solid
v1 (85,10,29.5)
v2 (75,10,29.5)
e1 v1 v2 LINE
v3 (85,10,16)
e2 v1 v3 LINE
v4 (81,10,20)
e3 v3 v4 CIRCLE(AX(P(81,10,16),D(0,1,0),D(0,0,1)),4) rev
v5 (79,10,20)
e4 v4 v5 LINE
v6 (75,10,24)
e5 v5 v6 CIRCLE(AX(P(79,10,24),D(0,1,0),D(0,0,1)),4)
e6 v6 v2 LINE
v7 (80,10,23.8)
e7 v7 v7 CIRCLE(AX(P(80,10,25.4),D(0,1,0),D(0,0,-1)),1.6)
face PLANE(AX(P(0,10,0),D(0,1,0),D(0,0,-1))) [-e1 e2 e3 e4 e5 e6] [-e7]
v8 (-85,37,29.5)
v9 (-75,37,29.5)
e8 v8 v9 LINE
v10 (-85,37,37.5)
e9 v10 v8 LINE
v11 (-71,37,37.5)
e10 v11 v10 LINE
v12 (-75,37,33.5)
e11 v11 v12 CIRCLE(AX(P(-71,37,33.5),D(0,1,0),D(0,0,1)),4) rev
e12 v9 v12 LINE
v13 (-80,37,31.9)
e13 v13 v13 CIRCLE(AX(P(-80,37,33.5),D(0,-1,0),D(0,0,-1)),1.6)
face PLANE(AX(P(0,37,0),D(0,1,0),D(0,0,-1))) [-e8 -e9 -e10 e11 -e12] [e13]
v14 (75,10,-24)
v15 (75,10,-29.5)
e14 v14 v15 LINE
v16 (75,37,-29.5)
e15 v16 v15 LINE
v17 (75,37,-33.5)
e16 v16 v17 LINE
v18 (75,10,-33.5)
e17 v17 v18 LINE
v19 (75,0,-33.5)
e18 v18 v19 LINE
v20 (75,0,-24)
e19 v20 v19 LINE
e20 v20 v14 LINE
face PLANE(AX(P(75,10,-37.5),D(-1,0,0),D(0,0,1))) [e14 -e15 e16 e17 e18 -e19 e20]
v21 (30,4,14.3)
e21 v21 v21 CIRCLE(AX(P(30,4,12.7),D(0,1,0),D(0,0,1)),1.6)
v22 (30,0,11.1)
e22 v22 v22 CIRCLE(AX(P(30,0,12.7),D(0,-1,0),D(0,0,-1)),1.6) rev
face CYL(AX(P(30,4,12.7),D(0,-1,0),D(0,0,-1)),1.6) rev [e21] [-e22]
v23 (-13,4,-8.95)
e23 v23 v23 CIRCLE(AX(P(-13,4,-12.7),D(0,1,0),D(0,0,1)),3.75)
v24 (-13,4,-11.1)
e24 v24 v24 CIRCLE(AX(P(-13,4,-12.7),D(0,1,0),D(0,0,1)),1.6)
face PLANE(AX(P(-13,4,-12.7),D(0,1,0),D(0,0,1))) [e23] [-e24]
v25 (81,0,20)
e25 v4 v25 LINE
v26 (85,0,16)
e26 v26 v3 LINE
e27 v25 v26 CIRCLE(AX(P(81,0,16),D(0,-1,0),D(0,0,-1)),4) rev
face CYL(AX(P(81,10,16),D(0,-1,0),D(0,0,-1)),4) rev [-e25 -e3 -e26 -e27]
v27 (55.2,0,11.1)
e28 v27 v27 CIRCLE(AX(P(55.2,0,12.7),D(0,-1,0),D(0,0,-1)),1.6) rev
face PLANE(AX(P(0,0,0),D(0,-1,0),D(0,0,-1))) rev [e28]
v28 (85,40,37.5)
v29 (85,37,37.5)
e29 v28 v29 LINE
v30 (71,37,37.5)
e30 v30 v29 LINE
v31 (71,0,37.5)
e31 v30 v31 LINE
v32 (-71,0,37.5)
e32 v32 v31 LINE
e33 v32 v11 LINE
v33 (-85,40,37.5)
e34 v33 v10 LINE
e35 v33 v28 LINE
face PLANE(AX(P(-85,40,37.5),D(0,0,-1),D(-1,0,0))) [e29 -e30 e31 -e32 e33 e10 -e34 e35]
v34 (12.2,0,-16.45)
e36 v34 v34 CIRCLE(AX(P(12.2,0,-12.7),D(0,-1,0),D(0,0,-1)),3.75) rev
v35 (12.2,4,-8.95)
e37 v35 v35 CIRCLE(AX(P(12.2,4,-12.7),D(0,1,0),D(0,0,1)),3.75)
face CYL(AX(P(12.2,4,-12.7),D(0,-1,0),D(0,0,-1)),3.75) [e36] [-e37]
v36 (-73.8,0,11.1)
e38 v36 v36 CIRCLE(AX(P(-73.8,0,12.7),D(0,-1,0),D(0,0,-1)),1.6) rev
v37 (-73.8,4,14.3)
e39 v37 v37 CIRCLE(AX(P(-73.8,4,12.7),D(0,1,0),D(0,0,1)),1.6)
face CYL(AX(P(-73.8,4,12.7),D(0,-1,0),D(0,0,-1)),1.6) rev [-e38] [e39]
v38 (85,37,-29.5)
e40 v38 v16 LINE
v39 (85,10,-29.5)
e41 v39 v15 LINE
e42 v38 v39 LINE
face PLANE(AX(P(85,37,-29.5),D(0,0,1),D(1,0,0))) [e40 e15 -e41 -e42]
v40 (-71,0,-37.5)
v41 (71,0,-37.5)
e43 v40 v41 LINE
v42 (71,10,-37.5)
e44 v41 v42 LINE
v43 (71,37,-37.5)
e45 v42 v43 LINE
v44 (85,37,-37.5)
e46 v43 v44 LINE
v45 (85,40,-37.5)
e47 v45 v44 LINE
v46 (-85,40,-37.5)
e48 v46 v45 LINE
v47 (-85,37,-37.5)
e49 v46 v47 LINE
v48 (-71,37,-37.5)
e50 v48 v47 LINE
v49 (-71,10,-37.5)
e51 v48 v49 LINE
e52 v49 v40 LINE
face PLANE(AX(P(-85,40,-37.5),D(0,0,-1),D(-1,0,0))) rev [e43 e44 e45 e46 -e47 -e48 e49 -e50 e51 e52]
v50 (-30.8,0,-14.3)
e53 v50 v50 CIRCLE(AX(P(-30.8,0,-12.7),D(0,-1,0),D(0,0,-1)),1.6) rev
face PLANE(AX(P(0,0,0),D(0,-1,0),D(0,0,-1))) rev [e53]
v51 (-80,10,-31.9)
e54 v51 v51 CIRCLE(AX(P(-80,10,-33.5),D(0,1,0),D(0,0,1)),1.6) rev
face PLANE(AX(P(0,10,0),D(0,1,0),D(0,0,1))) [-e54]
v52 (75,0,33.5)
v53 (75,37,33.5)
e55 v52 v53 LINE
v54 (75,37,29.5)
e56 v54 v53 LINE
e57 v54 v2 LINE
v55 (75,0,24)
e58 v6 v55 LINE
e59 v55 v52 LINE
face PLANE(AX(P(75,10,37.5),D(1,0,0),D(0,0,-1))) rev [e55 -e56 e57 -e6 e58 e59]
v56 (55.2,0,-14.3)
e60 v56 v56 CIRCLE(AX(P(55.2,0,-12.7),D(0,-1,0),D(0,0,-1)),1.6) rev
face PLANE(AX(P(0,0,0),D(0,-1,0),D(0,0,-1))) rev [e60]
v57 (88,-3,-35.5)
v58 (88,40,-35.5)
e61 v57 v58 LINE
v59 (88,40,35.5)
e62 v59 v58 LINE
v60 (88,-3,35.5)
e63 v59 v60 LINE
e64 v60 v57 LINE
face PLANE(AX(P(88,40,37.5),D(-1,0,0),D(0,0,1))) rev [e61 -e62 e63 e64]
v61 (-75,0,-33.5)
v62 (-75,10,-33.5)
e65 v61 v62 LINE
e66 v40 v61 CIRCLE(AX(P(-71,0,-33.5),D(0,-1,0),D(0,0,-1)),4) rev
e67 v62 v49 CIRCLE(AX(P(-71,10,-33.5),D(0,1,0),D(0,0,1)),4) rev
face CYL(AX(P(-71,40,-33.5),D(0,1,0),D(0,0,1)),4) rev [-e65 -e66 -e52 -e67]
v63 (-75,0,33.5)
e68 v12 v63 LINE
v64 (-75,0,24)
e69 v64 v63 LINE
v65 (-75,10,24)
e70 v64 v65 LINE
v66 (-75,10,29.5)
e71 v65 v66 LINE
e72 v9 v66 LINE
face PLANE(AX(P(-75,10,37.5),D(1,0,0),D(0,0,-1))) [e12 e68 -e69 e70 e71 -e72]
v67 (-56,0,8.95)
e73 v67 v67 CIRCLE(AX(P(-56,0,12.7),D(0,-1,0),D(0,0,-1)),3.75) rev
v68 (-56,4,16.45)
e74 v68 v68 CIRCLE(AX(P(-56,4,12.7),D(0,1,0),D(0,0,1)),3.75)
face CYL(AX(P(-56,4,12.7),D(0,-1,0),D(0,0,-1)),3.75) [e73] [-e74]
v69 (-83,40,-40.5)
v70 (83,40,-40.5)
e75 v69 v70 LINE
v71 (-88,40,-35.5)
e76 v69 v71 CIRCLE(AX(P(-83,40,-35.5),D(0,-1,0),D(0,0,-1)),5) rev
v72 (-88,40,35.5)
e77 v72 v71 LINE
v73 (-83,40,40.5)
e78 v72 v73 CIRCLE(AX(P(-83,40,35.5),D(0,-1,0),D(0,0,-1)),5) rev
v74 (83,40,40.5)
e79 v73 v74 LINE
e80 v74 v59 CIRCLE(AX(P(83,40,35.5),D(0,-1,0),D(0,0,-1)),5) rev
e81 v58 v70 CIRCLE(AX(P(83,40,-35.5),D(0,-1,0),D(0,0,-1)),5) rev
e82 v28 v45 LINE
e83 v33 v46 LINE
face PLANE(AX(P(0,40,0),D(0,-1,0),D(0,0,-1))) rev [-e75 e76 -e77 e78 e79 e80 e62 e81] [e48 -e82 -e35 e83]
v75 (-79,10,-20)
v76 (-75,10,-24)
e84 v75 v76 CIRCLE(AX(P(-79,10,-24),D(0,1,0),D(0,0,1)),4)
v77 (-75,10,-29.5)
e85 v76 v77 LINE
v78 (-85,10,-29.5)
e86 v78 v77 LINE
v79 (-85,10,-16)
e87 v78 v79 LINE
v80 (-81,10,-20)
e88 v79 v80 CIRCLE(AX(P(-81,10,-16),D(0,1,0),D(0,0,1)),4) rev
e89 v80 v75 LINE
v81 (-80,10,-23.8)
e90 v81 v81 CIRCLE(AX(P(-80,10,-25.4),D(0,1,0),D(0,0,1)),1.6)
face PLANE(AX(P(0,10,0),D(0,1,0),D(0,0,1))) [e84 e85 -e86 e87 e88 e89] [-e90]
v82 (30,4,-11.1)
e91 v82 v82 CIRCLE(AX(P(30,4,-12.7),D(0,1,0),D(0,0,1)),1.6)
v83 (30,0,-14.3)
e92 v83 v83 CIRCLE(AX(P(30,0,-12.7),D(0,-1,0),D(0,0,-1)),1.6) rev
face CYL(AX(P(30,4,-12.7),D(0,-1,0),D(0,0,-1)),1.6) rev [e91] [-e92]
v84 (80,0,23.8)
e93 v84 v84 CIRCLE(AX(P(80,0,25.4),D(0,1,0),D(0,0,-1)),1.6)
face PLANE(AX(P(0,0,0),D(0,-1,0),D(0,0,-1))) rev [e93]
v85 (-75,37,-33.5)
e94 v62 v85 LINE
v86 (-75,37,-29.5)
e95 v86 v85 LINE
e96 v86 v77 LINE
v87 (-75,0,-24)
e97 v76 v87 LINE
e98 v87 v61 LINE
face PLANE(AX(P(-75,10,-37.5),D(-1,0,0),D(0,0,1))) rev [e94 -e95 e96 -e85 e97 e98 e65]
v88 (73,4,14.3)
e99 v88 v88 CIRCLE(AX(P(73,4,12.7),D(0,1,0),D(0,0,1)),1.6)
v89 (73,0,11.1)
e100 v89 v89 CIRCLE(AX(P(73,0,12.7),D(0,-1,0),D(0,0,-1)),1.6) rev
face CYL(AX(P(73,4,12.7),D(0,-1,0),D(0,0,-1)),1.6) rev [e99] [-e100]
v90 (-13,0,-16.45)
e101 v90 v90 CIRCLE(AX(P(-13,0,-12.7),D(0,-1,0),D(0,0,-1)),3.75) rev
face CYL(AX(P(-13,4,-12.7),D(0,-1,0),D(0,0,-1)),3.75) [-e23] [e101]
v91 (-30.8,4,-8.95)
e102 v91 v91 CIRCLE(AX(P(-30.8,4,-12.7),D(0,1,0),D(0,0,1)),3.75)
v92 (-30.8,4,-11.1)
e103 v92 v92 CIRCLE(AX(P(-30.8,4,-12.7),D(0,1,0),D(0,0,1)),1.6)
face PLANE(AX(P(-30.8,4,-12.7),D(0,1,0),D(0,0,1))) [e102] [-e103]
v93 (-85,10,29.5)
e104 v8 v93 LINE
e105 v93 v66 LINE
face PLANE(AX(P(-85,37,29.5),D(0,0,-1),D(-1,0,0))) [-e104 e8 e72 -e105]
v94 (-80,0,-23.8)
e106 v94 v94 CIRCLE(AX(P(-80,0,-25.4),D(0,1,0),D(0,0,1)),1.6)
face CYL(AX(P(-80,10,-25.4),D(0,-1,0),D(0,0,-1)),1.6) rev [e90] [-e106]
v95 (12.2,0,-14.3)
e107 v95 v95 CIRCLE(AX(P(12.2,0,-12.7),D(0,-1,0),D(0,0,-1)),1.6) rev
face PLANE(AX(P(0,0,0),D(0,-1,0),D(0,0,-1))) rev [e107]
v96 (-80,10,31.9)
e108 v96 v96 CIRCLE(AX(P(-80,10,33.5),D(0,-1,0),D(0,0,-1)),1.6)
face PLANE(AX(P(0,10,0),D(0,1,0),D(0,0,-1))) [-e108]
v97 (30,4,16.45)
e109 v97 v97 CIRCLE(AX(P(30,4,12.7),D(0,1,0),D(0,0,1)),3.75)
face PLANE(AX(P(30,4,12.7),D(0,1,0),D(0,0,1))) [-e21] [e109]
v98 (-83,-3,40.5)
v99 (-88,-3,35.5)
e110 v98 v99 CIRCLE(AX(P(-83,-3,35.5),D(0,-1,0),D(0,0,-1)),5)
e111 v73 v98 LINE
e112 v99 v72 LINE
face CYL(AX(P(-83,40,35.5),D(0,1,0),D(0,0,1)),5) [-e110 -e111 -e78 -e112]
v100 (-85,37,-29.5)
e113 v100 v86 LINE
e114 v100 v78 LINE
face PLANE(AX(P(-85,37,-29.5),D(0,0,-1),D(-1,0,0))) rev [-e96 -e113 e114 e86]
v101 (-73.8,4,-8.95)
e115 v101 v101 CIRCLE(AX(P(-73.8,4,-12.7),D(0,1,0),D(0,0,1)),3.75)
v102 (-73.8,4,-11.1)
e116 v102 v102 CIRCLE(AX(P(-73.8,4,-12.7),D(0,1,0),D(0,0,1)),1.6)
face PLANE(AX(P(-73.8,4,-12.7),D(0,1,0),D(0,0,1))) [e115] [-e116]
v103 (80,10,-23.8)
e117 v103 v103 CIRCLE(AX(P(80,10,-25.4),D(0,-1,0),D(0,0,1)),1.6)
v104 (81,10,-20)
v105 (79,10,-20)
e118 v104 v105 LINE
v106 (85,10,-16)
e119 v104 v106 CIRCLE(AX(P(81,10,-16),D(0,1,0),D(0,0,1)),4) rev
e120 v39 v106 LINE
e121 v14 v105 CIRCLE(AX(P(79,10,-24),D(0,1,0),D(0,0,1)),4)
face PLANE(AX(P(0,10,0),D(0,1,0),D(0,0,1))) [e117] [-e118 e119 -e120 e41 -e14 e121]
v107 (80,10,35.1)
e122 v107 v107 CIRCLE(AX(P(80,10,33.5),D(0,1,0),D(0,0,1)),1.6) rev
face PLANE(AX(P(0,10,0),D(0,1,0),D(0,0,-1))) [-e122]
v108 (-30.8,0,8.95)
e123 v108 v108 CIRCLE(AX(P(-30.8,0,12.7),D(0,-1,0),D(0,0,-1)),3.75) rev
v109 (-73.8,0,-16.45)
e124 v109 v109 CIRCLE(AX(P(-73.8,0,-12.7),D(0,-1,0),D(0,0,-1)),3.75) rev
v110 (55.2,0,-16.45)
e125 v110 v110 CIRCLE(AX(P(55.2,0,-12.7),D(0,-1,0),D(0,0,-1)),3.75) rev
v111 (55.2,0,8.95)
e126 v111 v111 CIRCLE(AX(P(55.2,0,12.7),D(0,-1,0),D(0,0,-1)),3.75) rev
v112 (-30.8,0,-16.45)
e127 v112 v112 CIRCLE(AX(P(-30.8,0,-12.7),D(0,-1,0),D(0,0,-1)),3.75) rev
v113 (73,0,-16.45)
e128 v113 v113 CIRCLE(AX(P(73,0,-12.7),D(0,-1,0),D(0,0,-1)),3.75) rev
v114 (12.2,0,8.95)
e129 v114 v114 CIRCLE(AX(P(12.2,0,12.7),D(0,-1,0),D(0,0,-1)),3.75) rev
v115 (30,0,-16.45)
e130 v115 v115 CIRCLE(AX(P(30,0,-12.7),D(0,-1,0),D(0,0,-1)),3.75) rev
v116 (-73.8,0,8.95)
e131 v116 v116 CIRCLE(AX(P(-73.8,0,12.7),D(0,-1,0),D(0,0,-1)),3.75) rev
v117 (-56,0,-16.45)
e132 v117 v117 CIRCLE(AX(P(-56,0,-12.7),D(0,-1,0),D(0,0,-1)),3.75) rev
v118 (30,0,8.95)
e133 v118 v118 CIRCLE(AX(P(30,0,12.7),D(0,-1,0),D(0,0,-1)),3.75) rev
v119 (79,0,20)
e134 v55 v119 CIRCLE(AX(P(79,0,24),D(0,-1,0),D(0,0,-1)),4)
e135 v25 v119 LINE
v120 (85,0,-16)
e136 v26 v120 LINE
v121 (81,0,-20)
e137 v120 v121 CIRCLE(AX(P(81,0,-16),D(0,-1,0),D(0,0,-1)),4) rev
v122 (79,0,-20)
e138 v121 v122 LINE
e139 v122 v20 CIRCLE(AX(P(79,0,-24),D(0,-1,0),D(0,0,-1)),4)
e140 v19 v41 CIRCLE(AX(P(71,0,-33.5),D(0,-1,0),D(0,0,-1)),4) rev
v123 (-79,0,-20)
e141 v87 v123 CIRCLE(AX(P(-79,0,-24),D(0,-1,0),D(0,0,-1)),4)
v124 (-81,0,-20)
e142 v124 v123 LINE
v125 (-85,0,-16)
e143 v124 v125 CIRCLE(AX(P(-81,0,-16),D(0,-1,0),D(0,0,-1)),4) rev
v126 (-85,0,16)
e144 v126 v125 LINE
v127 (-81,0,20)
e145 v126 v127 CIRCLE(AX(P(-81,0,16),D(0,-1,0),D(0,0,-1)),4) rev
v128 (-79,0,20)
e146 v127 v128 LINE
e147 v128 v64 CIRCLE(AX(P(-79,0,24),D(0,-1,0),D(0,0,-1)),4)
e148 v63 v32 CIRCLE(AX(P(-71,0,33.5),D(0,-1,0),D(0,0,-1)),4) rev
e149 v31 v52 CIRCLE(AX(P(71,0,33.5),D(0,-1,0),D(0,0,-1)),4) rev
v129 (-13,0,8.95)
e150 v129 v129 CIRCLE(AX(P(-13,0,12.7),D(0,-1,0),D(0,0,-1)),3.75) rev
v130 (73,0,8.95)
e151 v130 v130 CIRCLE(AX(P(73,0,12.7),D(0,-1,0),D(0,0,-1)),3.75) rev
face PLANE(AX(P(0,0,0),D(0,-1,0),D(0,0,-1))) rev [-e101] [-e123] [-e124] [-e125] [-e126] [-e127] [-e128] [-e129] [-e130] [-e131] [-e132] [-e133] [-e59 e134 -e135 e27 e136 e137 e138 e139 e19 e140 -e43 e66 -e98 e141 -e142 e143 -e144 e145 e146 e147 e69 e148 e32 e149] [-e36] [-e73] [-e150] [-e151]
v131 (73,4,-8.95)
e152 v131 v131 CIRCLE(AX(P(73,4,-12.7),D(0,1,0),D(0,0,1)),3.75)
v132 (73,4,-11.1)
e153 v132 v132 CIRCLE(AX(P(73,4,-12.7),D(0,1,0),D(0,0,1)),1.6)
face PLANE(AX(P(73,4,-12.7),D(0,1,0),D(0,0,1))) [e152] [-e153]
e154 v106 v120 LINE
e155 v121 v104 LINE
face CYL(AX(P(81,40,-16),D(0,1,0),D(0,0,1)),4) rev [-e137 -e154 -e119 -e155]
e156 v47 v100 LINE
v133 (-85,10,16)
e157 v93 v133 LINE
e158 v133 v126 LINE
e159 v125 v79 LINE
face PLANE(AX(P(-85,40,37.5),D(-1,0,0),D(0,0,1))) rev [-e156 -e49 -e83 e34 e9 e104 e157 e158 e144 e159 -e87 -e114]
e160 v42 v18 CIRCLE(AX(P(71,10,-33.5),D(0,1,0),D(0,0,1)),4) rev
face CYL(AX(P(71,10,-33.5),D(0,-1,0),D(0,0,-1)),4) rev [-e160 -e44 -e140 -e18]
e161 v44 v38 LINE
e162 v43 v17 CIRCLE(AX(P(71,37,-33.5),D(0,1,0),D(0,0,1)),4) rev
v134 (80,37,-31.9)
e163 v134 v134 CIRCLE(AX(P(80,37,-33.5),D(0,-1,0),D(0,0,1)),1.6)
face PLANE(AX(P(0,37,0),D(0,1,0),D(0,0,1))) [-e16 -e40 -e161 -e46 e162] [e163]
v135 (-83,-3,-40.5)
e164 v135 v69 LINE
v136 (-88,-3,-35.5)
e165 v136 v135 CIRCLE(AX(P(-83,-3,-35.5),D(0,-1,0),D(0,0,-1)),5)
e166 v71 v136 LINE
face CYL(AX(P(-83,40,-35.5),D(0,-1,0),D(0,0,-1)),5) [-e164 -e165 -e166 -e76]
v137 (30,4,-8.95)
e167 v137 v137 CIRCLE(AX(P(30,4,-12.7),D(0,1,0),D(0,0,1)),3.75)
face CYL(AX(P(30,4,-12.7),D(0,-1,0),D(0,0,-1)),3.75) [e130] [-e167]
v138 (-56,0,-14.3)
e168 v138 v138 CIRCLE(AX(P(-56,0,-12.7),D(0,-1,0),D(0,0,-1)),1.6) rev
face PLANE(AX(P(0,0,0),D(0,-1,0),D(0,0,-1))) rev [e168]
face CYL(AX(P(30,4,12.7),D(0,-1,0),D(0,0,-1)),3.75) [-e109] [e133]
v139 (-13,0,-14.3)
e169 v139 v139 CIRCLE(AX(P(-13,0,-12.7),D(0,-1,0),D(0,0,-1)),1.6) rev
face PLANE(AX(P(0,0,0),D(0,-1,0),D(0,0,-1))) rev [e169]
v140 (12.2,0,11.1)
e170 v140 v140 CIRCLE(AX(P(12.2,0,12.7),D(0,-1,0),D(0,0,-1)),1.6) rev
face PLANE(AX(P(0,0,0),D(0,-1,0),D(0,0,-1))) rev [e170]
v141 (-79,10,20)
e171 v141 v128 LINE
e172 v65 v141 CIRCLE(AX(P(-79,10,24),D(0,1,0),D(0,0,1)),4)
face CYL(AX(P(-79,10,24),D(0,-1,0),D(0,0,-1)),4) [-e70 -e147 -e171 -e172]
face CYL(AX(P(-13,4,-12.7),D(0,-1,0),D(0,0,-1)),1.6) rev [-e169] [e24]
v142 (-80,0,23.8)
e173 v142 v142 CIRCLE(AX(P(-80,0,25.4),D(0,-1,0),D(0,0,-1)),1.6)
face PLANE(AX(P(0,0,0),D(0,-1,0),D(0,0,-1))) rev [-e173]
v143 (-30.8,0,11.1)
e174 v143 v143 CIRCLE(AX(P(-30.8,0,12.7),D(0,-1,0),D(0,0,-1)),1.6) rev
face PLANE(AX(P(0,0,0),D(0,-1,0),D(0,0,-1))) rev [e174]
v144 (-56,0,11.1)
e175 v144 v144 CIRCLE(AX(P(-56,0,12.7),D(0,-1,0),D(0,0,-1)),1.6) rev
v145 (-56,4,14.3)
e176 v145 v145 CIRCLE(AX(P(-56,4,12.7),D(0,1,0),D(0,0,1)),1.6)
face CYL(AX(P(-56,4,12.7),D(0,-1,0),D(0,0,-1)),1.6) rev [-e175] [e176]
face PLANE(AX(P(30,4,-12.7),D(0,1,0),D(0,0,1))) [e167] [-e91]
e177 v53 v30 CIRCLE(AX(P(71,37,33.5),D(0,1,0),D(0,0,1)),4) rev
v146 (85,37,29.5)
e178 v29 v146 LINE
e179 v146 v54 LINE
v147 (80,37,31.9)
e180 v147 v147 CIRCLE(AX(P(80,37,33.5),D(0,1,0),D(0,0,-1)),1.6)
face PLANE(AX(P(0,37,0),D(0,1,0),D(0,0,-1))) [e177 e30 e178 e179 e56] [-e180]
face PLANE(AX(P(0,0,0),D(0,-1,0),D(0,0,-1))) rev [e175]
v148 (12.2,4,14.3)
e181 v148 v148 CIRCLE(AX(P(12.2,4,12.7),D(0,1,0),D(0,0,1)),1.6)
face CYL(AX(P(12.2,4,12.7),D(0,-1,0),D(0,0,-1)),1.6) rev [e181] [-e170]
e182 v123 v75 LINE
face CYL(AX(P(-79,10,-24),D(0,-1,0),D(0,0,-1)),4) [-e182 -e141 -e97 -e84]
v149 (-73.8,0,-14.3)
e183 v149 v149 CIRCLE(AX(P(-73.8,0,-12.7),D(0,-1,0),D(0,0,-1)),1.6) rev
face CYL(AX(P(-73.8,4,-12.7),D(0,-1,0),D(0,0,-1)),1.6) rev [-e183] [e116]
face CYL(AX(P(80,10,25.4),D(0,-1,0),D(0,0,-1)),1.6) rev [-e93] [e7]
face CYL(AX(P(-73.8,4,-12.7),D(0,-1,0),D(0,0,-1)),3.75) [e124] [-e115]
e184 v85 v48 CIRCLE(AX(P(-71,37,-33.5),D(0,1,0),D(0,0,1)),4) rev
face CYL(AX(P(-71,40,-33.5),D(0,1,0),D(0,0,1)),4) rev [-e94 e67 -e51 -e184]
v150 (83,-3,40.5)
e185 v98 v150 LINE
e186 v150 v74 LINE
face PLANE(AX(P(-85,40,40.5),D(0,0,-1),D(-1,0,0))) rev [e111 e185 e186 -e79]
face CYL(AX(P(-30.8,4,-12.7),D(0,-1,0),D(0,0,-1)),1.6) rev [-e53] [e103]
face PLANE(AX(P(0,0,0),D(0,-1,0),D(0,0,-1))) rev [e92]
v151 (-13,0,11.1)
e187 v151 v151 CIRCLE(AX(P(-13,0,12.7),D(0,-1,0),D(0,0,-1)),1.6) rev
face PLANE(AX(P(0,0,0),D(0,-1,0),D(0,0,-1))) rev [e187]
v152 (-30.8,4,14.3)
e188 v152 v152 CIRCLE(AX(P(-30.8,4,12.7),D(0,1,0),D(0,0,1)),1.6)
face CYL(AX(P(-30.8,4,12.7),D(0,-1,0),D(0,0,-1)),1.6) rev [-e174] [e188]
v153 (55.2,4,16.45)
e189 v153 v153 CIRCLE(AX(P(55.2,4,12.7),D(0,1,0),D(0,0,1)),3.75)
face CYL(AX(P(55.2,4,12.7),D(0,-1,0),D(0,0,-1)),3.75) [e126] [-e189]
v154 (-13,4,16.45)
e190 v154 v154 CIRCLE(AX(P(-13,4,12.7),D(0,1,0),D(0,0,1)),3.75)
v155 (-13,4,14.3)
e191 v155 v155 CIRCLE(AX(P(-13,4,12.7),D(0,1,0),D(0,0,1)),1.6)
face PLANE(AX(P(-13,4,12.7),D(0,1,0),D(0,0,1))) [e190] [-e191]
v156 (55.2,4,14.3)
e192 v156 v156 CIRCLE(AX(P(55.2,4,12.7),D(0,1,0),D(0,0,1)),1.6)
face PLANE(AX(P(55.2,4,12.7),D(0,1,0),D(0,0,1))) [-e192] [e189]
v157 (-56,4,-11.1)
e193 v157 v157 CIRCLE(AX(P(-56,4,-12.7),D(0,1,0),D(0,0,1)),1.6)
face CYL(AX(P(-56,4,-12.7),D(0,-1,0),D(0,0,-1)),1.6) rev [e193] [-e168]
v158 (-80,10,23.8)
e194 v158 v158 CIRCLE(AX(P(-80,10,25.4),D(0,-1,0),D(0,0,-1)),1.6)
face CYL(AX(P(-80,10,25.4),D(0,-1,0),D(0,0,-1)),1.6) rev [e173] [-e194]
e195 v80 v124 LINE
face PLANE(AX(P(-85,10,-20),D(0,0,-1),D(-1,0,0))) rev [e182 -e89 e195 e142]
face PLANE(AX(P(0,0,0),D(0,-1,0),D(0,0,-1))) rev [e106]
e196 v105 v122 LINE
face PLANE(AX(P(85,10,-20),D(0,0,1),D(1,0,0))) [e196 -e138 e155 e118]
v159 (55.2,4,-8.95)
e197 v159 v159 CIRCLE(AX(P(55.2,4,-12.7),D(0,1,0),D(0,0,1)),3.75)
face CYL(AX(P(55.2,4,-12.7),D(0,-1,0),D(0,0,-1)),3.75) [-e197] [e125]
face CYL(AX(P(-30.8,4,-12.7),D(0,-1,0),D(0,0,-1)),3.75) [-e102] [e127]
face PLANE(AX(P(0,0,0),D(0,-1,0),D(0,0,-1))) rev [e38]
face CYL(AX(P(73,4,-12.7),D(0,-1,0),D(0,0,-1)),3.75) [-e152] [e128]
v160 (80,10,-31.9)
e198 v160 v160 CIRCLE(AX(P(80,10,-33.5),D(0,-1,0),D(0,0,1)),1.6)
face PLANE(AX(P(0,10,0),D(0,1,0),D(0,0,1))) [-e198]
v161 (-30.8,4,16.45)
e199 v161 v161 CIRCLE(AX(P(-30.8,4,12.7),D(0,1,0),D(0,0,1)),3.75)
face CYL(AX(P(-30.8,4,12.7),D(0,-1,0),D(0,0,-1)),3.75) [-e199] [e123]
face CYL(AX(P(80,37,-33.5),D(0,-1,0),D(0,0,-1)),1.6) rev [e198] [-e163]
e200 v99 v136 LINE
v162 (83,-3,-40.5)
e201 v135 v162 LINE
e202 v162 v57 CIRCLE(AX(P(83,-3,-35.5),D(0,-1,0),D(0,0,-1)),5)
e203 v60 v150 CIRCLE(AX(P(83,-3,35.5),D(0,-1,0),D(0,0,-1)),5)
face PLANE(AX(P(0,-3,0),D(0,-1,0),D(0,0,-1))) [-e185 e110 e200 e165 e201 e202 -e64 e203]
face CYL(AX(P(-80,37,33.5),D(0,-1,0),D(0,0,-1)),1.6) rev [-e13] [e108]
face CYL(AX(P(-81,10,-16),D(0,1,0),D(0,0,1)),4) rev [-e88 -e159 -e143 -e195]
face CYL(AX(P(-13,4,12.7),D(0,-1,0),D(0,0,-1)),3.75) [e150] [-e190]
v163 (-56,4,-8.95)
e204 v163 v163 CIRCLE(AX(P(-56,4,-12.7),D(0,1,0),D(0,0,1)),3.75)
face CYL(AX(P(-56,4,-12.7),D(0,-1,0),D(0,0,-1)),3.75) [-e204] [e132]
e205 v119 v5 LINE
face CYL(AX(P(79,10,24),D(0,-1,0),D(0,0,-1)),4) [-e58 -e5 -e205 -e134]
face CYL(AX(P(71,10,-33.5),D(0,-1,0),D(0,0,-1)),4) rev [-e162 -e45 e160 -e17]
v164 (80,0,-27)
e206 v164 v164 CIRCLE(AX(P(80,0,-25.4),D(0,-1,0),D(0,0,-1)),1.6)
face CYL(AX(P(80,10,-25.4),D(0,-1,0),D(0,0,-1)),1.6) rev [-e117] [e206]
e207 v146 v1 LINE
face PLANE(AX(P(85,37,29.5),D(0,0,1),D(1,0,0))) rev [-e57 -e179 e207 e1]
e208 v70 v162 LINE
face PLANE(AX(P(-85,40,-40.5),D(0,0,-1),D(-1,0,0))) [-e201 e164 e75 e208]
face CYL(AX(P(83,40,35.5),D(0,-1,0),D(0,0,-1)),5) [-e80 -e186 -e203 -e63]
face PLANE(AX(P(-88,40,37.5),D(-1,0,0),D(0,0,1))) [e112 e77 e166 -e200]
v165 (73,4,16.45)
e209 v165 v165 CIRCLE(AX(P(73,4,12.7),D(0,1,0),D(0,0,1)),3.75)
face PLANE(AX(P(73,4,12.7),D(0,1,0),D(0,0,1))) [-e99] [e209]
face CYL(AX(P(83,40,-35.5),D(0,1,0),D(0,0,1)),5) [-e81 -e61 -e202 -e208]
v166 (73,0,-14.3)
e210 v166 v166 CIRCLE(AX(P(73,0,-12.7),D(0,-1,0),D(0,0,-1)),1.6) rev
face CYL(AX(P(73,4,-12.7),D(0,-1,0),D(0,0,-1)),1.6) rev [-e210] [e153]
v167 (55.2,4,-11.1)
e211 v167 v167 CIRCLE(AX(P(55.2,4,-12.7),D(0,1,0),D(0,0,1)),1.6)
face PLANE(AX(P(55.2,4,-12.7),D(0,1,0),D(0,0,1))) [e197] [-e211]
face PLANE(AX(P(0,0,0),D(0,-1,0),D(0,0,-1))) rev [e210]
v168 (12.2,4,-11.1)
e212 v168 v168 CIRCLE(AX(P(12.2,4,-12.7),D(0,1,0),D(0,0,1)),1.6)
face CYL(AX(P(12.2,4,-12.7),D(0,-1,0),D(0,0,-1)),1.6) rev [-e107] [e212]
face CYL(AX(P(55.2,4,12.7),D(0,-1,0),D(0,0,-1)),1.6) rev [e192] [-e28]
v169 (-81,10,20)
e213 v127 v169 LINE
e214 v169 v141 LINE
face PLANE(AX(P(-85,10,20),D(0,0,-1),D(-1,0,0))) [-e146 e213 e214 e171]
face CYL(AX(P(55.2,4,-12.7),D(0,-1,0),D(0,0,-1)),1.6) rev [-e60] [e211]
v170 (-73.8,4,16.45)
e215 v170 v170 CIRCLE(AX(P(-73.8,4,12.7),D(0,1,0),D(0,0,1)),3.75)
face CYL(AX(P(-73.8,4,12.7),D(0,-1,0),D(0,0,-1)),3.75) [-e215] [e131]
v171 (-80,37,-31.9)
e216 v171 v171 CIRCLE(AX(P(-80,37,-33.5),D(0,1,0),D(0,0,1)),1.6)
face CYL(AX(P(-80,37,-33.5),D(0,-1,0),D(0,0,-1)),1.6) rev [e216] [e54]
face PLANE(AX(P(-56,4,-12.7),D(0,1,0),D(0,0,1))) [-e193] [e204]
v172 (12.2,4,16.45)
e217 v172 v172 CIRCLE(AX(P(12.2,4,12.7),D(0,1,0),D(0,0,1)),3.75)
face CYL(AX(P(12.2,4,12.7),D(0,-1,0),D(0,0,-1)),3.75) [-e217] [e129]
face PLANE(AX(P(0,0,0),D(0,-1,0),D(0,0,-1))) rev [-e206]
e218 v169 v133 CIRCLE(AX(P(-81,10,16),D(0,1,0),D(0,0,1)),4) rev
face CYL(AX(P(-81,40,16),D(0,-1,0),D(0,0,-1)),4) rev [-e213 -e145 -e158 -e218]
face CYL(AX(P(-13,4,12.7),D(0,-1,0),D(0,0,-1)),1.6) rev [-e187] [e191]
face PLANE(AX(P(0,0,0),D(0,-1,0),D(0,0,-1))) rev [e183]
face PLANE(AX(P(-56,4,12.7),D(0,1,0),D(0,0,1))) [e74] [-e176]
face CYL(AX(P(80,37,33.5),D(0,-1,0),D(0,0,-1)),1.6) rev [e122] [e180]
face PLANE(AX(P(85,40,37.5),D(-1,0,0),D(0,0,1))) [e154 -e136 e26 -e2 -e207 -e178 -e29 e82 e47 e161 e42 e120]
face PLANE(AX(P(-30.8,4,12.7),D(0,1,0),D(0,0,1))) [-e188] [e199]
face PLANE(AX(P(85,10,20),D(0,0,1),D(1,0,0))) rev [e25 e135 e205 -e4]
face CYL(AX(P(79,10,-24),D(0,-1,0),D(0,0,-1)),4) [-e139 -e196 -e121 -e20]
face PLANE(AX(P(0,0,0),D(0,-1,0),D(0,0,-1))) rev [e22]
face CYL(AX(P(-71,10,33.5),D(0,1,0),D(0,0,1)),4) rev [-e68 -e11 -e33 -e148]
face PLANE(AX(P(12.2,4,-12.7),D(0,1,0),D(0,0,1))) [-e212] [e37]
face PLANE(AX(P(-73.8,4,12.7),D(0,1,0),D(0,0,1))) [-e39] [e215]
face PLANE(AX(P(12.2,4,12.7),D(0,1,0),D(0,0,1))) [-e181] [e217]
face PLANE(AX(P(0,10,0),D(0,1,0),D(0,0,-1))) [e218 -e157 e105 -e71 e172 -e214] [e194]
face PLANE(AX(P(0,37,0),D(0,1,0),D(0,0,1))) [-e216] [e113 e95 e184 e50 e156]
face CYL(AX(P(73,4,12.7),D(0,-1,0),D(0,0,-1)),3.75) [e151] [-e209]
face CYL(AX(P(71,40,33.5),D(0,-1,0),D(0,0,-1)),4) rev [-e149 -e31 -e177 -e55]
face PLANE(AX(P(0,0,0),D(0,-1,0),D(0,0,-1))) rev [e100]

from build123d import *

# Parameters (mm, degrees)
SKETCH1_W           = 170
SKETCH1_H           = 75
BOSS_EXTRUDE1_DEPTH = 40
SHELL1_T            = 3
FILLET1_R           = 5
SKETCH2_W           = 10
SKETCH2_H           = 17.5
SKETCH2_R           = 1.6
BOSS_EXTRUDE2_DEPTH = 10
FILLET2_R           = 4
SKETCH5_W           = 10
SKETCH5_H           = 8
SKETCH5_R           = 1.6
BOSS_EXTRUDE3_DEPTH = 27
FILLET3_R           = 4
MIRROR7_OUTLINE_W   = 10
MIRROR7_OUTLINE_H   = 8
MIRROR7_OUTLINE_R   = 1.6
MIRROR7_DEPTH       = 37
MIRROR7_2_OUTLINE_R = 1.6
MIRROR7_2_DEPTH     = 10
MIRROR9_OUTLINE_W   = 10
MIRROR9_OUTLINE_H   = 8
MIRROR9_OUTLINE_R   = 1.6
MIRROR9_DEPTH       = 37
MIRROR9_2_OUTLINE_R = 1.6
MIRROR9_2_DEPTH     = 10
FILLET5_R           = 4
SKETCH6_R           = 3.75
SKETCH6_R_2         = 1.6
BOSS_EXTRUDE4_DEPTH = 7
LPATTERN1_COUNT     = 4
LPATTERN1_PITCH     = 43


# Read off the part's stored shape, not the designer's step: Mirror7, Mirror9
# Some blends are built 0.0001 mm under size
with BuildPart() as part:
    # Sketch1 → Boss-Extrude1 (new body)
    with BuildSketch(Plane(origin=(0, 0, 0), x_dir=(1, 0, 0), z_dir=(0, 1, 0))):
        Rectangle(SKETCH1_W, SKETCH1_H)
    extrude(amount=BOSS_EXTRUDE1_DEPTH)

    # Shell1
    shell1_openings = [part.faces().sort_by_distance(p)[0] for p in [
        (0, 40, 0),
    ]]
    offset(amount=SHELL1_T, openings=shell1_openings, kind=Kind.INTERSECTION)

    # Fillet1
    # the kernel refuses this fillet: 5 mm, written as the material it takes off along each edge
    with BuildSketch(Plane(origin=(-88, 52.5, 40.5), x_dir=(1, 0, 0), z_dir=(0, -1, 0)), Plane(origin=(88, -15.5, 40.5), x_dir=(-1, 0, 0), z_dir=(0, 1, 0)), Plane(origin=(88, -15.5, -40.5), x_dir=(0, 0, 1), z_dir=(0, 1, 0)), Plane(origin=(-88, -15.5, -40.5), x_dir=(1, 0, 0), z_dir=(0, 1, 0))) as fillet1_piece_1:
        with BuildLine():
            CenterArc((FILLET1_R, -FILLET1_R), FILLET1_R, 90, 90)
            Line((0, -FILLET1_R), (0, 0))
            Line((0, 0), (FILLET1_R, 0))
        make_face()
    extrude(amount=68, mode=Mode.SUBTRACT)

    # Sketch2 → Boss-Extrude2 (add)
    with BuildSketch(Plane(origin=(0, 0, 0), x_dir=(1, 0, 0), z_dir=(0, 1, 0))):
        with Locations((-80, 28.75)):
            Rectangle(SKETCH2_W, SKETCH2_H)
        with Locations(Location((-80, 25.4, 0), (0, 0, 270))):
            Circle(SKETCH2_R, mode=Mode.SUBTRACT)
    extrude(amount=BOSS_EXTRUDE2_DEPTH)

    # Fillet2
    fillet2_edges = [part.edges().sort_by_distance(p)[0] for p in [
        (-85, 5, -20),
        (-75, 5, -20),
        (-75, 5, -37.5),
    ]]
    fillet(fillet2_edges, radius=FILLET2_R)

    # Sketch5 → Boss-Extrude3 (add)
    with BuildSketch(Plane(origin=(0, 10, 0), x_dir=(1, 0, 0), z_dir=(0, 1, 0))):
        with Locations((-80, 33.5)):
            Rectangle(SKETCH5_W, SKETCH5_H)
        with Locations(Location((-80, 33.5, 0), (0, 0, 270))):
            Circle(SKETCH5_R, mode=Mode.SUBTRACT)
    extrude(amount=BOSS_EXTRUDE3_DEPTH)

    # Fillet3
    fillet3_edges = [part.edges().sort_by_distance(p)[0] for p in [
        (-75, 23.5, -37.5),
    ]]
    fillet(fillet3_edges, radius=FILLET3_R)

    # Mirror7 outline → Mirror7 (add)
    with BuildSketch(Plane(origin=(0, 0, 0), x_dir=(1, 0, 0), z_dir=(0, 1, 0))):
        with Locations((-80, -33.5)):
            Rectangle(MIRROR7_OUTLINE_W, MIRROR7_OUTLINE_H)
        with Locations((-80, -33.5)):
            Circle(MIRROR7_OUTLINE_R, mode=Mode.SUBTRACT)
    extrude(amount=MIRROR7_DEPTH)

    # Mirror7 2 outline → Mirror7 2 (add)
    # profile 1 of 2: a face of its own
    with BuildSketch(Plane(origin=(0, 0, 0), x_dir=(1, 0, 0), z_dir=(0, 1, 0))):
        with BuildLine():
            Line((-85, -29.5), (-75, -29.5))
            Line((-75, -29.5), (-75, -24))
            ThreePointArc((-75, -24), (-76.171572875, -21.171572875), (-79, -20))
            Line((-79, -20), (-81, -20))
            ThreePointArc((-81, -20), (-83.828427125, -18.828427125), (-85, -16))
            Line((-85, -16), (-85, -29.5))
        make_face()
        with Locations((-80, -25.4)):
            Circle(MIRROR7_2_OUTLINE_R, mode=Mode.SUBTRACT)
    # profile 2 of 2: a face of its own
    with BuildSketch(Plane(origin=(0, 0, 0), x_dir=(1, 0, 0), z_dir=(0, 1, 0))):
        with Locations((-80, -33.5)):
            Circle(MIRROR7_2_OUTLINE_R)
    extrude(amount=MIRROR7_2_DEPTH)

    # Mirror9 outline → Mirror9 (add)
    # profile 1 of 2: a face of its own
    with BuildSketch(Plane(origin=(0, 0, 0), x_dir=(1, 0, 0), z_dir=(0, 1, 0))):
        with Locations((80, 33.5)):
            Rectangle(MIRROR9_OUTLINE_W, MIRROR9_OUTLINE_H)
        with Locations((80, 33.5)):
            Circle(MIRROR9_OUTLINE_R, mode=Mode.SUBTRACT)
    # profile 2 of 2: a face of its own
    with BuildSketch(Plane(origin=(0, 0, 0), x_dir=(1, 0, 0), z_dir=(0, 1, 0))):
        with Locations((80, -33.5)):
            Rectangle(MIRROR9_OUTLINE_W, MIRROR9_OUTLINE_H)
        with Locations((80, -33.5)):
            Circle(MIRROR9_OUTLINE_R, mode=Mode.SUBTRACT)
    extrude(amount=MIRROR9_DEPTH)

    # Mirror9 2 outline → Mirror9 2 (add)
    # profile 1 of 5: a face of its own
    with BuildSketch(Plane(origin=(0, 0, 0), x_dir=(1, 0, 0), z_dir=(0, 1, 0))):
        with BuildLine():
            ThreePointArc((75, 24), (76.171572875, 21.171572875), (79, 20))
            Line((79, 20), (85, 20))
            Line((85, 20), (85, 29.5))
            Line((85, 29.5), (75, 29.5))
            Line((75, 29.5), (75, 24))
        make_face()
        with Locations((80, 25.4)):
            Circle(MIRROR9_2_OUTLINE_R, mode=Mode.SUBTRACT)
    # profile 2 of 5: a face of its own
    with BuildSketch(Plane(origin=(0, 0, 0), x_dir=(1, 0, 0), z_dir=(0, 1, 0))):
        with BuildLine():
            Line((85, -29.5), (85, -20))
            Line((85, -20), (79, -20))
            ThreePointArc((79, -20), (76.171572875, -21.171572875), (75, -24))
            Line((75, -24), (75, -29.5))
            Line((75, -29.5), (85, -29.5))
        make_face()
        with Locations((80, -25.4)):
            Circle(MIRROR9_2_OUTLINE_R, mode=Mode.SUBTRACT)
    # profile 3 of 5: a face of its own
    with BuildSketch(Plane(origin=(0, 0, 0), x_dir=(1, 0, 0), z_dir=(0, 1, 0))):
        with BuildLine():
            ThreePointArc((71, 37.5), (73.828427125, 36.328427125), (75, 33.5))
            Line((75, 33.5), (75, 37.5))
            Line((75, 37.5), (71, 37.5))
        make_face()
    # profile 4 of 5: a face of its own
    with BuildSketch(Plane(origin=(0, 0, 0), x_dir=(1, 0, 0), z_dir=(0, 1, 0))):
        with Locations((80, -33.5)):
            Circle(MIRROR9_2_OUTLINE_R)
    # profile 5 of 5: a face of its own
    with BuildSketch(Plane(origin=(0, 0, 0), x_dir=(1, 0, 0), z_dir=(0, 1, 0))):
        with Locations((80, 33.5)):
            Circle(MIRROR9_2_OUTLINE_R)
    extrude(amount=MIRROR9_2_DEPTH)

    # Fillet5
    fillet5_edges = [part.edges().sort_by_distance(p)[0] for p in [
        (75, 18.5, 37.5),
        (85, 5, 20),
        (85, 5, -20),
        (75, 23.5, -37.5),
        (-75, 18.5, 37.5),
    ]]
    fillet(fillet5_edges, radius=FILLET5_R - 0.0001)  # a hair under: the kernel refuses the full size

    # Sketch6 → Boss-Extrude4 (add)
    # profile 1 of 4: a face of its own
    with BuildSketch(Plane(origin=(0, -3, 0), x_dir=(1, 0, 0), z_dir=(0, 1, 0))):
        with Locations(Location((-56, 12.7, 0), (0, 0, 90))):
            Circle(SKETCH6_R)
        with Locations(Location((-56, 12.7, 0), (0, 0, 90))):
            Circle(SKETCH6_R_2, mode=Mode.SUBTRACT)
    # profile 2 of 4: a face of its own
    with BuildSketch(Plane(origin=(0, -3, 0), x_dir=(1, 0, 0), z_dir=(0, 1, 0))):
        with Locations(Location((-56, -12.7, 0), (0, 0, 90))):
            Circle(SKETCH6_R)
        with Locations(Location((-56, -12.7, 0), (0, 0, 90))):
            Circle(SKETCH6_R_2, mode=Mode.SUBTRACT)
    # profile 3 of 4: a face of its own
    with BuildSketch(Plane(origin=(0, -3, 0), x_dir=(1, 0, 0), z_dir=(0, 1, 0))):
        with Locations(Location((-73.8, 12.7, 0), (0, 0, 90))):
            Circle(SKETCH6_R)
        with Locations(Location((-73.8, 12.7, 0), (0, 0, 90))):
            Circle(SKETCH6_R_2, mode=Mode.SUBTRACT)
    # profile 4 of 4: a face of its own
    with BuildSketch(Plane(origin=(0, -3, 0), x_dir=(1, 0, 0), z_dir=(0, 1, 0))):
        with Locations(Location((-73.8, -12.7, 0), (0, 0, 90))):
            Circle(SKETCH6_R)
        with Locations(Location((-73.8, -12.7, 0), (0, 0, 90))):
            Circle(SKETCH6_R_2, mode=Mode.SUBTRACT)
    boss_extrude4 = extrude(amount=BOSS_EXTRUDE4_DEPTH)

    # LPattern1: Boss-Extrude4 ×4
    with Locations(*[(i * LPATTERN1_PITCH, 0, 0) for i in range(1, LPATTERN1_COUNT)]):
        add(boss_extrude4)


solid = part.part
